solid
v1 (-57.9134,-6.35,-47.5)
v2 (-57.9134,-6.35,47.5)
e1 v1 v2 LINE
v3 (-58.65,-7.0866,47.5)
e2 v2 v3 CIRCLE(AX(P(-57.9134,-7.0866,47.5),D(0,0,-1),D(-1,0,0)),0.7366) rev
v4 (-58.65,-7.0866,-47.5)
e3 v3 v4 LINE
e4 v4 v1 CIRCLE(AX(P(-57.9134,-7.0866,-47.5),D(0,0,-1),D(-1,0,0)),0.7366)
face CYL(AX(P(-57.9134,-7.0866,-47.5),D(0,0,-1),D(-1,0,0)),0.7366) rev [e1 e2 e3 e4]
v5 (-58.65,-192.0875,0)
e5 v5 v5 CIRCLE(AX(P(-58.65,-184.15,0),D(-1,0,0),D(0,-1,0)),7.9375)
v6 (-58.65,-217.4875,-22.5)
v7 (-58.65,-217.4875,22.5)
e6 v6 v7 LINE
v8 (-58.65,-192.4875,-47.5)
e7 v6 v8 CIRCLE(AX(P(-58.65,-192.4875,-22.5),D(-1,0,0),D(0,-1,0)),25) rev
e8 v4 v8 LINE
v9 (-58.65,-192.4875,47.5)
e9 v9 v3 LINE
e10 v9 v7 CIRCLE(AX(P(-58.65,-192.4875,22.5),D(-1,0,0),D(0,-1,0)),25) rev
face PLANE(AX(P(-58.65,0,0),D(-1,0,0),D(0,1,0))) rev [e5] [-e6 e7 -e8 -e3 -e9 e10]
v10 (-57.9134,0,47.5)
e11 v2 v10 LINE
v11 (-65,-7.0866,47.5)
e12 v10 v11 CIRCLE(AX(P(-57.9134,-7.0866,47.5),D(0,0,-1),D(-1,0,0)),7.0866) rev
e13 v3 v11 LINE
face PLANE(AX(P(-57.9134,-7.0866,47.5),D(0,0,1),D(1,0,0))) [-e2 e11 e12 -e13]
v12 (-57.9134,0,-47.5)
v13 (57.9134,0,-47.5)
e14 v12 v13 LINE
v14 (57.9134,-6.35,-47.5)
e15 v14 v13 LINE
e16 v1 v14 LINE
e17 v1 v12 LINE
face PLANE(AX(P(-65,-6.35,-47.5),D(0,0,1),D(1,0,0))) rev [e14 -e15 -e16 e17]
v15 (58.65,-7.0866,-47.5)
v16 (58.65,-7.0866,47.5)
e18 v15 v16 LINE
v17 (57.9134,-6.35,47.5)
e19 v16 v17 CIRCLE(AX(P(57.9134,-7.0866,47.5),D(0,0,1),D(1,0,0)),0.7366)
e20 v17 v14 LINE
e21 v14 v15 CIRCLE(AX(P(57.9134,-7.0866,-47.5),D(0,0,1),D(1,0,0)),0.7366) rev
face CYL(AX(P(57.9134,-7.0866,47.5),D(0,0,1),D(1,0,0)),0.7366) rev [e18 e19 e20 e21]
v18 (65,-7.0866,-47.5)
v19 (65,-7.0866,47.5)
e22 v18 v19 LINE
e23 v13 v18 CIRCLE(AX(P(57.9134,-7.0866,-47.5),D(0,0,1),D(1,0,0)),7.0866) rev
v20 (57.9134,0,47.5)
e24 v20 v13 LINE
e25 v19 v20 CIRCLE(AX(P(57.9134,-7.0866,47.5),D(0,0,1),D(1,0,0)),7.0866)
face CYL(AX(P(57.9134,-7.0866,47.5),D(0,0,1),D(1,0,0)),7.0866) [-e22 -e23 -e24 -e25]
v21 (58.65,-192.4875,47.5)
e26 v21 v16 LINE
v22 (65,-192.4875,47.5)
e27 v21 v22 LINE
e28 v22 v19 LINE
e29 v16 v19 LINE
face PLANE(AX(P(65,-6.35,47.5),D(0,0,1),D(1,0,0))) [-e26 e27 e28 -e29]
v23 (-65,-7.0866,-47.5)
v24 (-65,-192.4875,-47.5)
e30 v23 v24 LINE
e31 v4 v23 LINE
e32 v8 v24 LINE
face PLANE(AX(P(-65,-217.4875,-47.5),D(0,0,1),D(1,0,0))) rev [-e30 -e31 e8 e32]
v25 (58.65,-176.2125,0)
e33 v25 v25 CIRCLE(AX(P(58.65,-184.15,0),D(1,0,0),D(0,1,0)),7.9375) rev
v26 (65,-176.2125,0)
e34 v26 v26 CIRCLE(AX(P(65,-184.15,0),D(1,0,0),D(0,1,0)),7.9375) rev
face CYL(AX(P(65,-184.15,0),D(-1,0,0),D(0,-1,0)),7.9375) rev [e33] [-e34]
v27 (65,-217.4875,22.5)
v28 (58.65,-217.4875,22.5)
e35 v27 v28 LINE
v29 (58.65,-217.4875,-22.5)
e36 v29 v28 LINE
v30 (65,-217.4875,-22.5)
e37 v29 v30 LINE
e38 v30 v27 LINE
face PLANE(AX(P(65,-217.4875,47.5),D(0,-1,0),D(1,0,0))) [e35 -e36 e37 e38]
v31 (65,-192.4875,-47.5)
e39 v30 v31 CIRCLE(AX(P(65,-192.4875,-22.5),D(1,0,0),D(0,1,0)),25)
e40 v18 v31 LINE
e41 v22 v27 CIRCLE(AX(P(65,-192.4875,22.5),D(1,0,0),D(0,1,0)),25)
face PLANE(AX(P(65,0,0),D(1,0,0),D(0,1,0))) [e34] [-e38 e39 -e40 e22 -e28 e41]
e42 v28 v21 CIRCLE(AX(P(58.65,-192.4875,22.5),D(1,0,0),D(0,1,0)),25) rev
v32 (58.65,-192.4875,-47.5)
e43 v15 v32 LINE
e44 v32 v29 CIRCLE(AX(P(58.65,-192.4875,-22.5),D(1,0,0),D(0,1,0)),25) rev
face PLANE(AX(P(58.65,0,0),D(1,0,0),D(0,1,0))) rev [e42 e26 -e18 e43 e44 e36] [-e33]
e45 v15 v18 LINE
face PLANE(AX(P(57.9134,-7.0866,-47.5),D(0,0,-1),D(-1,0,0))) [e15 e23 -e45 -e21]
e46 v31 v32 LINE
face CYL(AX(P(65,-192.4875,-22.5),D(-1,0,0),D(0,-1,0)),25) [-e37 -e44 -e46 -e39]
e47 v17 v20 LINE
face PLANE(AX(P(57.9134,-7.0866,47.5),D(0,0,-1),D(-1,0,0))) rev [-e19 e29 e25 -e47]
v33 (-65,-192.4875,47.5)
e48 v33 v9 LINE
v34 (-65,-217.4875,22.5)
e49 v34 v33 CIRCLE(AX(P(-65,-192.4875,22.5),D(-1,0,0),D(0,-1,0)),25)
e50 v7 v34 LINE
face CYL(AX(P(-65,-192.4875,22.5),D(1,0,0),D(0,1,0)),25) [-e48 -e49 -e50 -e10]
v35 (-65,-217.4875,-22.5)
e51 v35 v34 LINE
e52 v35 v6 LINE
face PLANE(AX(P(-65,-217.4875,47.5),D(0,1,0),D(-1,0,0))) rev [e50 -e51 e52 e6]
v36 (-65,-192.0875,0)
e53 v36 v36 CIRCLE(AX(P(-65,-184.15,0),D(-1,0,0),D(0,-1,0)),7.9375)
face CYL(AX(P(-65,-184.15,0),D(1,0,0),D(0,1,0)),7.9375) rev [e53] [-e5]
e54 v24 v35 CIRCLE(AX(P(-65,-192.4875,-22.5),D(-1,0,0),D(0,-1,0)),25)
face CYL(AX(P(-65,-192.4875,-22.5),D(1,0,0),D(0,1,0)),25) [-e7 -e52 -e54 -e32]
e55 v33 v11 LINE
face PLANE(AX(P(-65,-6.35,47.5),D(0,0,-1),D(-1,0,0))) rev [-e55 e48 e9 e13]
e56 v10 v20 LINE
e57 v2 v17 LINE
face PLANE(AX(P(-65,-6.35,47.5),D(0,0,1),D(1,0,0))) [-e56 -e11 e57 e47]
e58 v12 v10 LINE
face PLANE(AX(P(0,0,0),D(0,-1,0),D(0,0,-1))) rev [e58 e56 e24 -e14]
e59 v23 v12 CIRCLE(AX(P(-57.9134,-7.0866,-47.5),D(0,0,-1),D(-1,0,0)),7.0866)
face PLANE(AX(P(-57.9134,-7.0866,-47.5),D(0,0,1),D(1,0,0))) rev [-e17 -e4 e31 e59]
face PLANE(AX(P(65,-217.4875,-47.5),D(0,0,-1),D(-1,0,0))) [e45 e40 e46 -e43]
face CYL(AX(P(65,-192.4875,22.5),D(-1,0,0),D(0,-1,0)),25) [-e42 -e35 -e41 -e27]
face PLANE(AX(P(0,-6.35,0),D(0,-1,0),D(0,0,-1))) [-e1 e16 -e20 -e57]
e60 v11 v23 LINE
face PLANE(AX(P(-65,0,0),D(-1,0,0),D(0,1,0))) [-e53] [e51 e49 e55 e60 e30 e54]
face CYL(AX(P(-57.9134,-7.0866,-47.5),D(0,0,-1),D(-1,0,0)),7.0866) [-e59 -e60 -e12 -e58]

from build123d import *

# Parameters (mm, degrees)
SKETCH3_W                    = 130
SKETCH3_H                    = 95
BASE_FLANGE1_DEPTH           = 6.35
EDGE_FLANGE1_STRIP_W         = 26.8732
EDGE_FLANGE1_STRIP_H         = 6.35
EDGE_FLANGE1_STRIP_CUT_DEPTH = 95
EDGE_FLANGE1_DEPTH           = 95
EDGE_FLANGE1_PROFILE_W       = 95
EDGE_FLANGE1_PROFILE_H       = 210.4009
EDGE_FLANGE1_PROFILE_R       = 7.9375
EDGE_FLANGE1_FLAT_DEPTH      = 6.35
FILLET1_R                    = 25


# Sheet-metal steps are written as plain solids
with BuildPart() as part:
    # Sketch3 → Base-Flange1 (new body)
    with BuildSketch(Plane(origin=(0, 0, 0), x_dir=(1, 0, 0), z_dir=(0, 1, 0))):
        Rectangle(SKETCH3_W, SKETCH3_H)
    extrude(amount=-BASE_FLANGE1_DEPTH)

    # Edge-Flange1 strip (across the edge) → Edge-Flange1 strip cut (cut)
    with BuildSketch(Plane(origin=(65, -6.35, -47.5), x_dir=(-1, 0, 0), z_dir=(0, 0, 1))):
        with Locations((-6.35, -3.175)):
            Rectangle(EDGE_FLANGE1_STRIP_W, EDGE_FLANGE1_STRIP_H)
    edge_flange1_strip_cut = extrude(amount=EDGE_FLANGE1_STRIP_CUT_DEPTH, mode=Mode.SUBTRACT)

    # Edge-Flange1 bend section (across the edge) → Edge-Flange1 (add)
    with BuildSketch(Plane(origin=(65, -6.35, -47.5), x_dir=(-1, 0, 0), z_dir=(0, 0, 1))):
        with BuildLine():
            Line((0, 0.7366), (6.35, 0.7366))
            ThreePointArc((6.35, 0.7366), (6.565745145, 0.215745145), (7.0866, 0))
            Line((7.0866, 0), (7.0866, -6.35))
            ThreePointArc((7.0866, -6.35), (2.075617084, -4.274382916), (0, 0.7366))
        make_face()
    edge_flange1 = extrude(amount=EDGE_FLANGE1_DEPTH)

    # Edge-Flange1 profile (on flange) → Edge-Flange1 flat (add)
    with BuildSketch(Plane(origin=(65, -6.35, 0), x_dir=(0, 0, -1), z_dir=(-1, 0, 0))):
        with Locations((0, 105.93705)):
            Rectangle(EDGE_FLANGE1_PROFILE_W, EDGE_FLANGE1_PROFILE_H)
        with Locations((0, 177.8)):
            Circle(EDGE_FLANGE1_PROFILE_R, mode=Mode.SUBTRACT)
    edge_flange1_flat = extrude(amount=EDGE_FLANGE1_FLAT_DEPTH)

    # Mirror1: Edge-Flange1 strip cut, Edge-Flange1, Edge-Flange1 flat across plane
    add(edge_flange1_strip_cut.mirror(Plane(origin=(0, 0, 0), x_dir=(0, 0, 1), z_dir=(1, 0, 0))), mode=Mode.SUBTRACT)
    add(edge_flange1.mirror(Plane(origin=(0, 0, 0), x_dir=(0, 0, 1), z_dir=(1, 0, 0))))
    add(edge_flange1_flat.mirror(Plane(origin=(0, 0, 0), x_dir=(0, 0, 1), z_dir=(1, 0, 0))))

    # Fillet1
    fillet1_edges = [part.edges().sort_by_distance(p)[0] for p in [
        (61.825, -217.4875, -47.5),
        (61.825, -217.4875, 47.5),
        (-61.825, -217.4875, 47.5),
        (-61.825, -217.4875, -47.5),
    ]]
    fillet(fillet1_edges, radius=FILLET1_R)


solid = part.part
